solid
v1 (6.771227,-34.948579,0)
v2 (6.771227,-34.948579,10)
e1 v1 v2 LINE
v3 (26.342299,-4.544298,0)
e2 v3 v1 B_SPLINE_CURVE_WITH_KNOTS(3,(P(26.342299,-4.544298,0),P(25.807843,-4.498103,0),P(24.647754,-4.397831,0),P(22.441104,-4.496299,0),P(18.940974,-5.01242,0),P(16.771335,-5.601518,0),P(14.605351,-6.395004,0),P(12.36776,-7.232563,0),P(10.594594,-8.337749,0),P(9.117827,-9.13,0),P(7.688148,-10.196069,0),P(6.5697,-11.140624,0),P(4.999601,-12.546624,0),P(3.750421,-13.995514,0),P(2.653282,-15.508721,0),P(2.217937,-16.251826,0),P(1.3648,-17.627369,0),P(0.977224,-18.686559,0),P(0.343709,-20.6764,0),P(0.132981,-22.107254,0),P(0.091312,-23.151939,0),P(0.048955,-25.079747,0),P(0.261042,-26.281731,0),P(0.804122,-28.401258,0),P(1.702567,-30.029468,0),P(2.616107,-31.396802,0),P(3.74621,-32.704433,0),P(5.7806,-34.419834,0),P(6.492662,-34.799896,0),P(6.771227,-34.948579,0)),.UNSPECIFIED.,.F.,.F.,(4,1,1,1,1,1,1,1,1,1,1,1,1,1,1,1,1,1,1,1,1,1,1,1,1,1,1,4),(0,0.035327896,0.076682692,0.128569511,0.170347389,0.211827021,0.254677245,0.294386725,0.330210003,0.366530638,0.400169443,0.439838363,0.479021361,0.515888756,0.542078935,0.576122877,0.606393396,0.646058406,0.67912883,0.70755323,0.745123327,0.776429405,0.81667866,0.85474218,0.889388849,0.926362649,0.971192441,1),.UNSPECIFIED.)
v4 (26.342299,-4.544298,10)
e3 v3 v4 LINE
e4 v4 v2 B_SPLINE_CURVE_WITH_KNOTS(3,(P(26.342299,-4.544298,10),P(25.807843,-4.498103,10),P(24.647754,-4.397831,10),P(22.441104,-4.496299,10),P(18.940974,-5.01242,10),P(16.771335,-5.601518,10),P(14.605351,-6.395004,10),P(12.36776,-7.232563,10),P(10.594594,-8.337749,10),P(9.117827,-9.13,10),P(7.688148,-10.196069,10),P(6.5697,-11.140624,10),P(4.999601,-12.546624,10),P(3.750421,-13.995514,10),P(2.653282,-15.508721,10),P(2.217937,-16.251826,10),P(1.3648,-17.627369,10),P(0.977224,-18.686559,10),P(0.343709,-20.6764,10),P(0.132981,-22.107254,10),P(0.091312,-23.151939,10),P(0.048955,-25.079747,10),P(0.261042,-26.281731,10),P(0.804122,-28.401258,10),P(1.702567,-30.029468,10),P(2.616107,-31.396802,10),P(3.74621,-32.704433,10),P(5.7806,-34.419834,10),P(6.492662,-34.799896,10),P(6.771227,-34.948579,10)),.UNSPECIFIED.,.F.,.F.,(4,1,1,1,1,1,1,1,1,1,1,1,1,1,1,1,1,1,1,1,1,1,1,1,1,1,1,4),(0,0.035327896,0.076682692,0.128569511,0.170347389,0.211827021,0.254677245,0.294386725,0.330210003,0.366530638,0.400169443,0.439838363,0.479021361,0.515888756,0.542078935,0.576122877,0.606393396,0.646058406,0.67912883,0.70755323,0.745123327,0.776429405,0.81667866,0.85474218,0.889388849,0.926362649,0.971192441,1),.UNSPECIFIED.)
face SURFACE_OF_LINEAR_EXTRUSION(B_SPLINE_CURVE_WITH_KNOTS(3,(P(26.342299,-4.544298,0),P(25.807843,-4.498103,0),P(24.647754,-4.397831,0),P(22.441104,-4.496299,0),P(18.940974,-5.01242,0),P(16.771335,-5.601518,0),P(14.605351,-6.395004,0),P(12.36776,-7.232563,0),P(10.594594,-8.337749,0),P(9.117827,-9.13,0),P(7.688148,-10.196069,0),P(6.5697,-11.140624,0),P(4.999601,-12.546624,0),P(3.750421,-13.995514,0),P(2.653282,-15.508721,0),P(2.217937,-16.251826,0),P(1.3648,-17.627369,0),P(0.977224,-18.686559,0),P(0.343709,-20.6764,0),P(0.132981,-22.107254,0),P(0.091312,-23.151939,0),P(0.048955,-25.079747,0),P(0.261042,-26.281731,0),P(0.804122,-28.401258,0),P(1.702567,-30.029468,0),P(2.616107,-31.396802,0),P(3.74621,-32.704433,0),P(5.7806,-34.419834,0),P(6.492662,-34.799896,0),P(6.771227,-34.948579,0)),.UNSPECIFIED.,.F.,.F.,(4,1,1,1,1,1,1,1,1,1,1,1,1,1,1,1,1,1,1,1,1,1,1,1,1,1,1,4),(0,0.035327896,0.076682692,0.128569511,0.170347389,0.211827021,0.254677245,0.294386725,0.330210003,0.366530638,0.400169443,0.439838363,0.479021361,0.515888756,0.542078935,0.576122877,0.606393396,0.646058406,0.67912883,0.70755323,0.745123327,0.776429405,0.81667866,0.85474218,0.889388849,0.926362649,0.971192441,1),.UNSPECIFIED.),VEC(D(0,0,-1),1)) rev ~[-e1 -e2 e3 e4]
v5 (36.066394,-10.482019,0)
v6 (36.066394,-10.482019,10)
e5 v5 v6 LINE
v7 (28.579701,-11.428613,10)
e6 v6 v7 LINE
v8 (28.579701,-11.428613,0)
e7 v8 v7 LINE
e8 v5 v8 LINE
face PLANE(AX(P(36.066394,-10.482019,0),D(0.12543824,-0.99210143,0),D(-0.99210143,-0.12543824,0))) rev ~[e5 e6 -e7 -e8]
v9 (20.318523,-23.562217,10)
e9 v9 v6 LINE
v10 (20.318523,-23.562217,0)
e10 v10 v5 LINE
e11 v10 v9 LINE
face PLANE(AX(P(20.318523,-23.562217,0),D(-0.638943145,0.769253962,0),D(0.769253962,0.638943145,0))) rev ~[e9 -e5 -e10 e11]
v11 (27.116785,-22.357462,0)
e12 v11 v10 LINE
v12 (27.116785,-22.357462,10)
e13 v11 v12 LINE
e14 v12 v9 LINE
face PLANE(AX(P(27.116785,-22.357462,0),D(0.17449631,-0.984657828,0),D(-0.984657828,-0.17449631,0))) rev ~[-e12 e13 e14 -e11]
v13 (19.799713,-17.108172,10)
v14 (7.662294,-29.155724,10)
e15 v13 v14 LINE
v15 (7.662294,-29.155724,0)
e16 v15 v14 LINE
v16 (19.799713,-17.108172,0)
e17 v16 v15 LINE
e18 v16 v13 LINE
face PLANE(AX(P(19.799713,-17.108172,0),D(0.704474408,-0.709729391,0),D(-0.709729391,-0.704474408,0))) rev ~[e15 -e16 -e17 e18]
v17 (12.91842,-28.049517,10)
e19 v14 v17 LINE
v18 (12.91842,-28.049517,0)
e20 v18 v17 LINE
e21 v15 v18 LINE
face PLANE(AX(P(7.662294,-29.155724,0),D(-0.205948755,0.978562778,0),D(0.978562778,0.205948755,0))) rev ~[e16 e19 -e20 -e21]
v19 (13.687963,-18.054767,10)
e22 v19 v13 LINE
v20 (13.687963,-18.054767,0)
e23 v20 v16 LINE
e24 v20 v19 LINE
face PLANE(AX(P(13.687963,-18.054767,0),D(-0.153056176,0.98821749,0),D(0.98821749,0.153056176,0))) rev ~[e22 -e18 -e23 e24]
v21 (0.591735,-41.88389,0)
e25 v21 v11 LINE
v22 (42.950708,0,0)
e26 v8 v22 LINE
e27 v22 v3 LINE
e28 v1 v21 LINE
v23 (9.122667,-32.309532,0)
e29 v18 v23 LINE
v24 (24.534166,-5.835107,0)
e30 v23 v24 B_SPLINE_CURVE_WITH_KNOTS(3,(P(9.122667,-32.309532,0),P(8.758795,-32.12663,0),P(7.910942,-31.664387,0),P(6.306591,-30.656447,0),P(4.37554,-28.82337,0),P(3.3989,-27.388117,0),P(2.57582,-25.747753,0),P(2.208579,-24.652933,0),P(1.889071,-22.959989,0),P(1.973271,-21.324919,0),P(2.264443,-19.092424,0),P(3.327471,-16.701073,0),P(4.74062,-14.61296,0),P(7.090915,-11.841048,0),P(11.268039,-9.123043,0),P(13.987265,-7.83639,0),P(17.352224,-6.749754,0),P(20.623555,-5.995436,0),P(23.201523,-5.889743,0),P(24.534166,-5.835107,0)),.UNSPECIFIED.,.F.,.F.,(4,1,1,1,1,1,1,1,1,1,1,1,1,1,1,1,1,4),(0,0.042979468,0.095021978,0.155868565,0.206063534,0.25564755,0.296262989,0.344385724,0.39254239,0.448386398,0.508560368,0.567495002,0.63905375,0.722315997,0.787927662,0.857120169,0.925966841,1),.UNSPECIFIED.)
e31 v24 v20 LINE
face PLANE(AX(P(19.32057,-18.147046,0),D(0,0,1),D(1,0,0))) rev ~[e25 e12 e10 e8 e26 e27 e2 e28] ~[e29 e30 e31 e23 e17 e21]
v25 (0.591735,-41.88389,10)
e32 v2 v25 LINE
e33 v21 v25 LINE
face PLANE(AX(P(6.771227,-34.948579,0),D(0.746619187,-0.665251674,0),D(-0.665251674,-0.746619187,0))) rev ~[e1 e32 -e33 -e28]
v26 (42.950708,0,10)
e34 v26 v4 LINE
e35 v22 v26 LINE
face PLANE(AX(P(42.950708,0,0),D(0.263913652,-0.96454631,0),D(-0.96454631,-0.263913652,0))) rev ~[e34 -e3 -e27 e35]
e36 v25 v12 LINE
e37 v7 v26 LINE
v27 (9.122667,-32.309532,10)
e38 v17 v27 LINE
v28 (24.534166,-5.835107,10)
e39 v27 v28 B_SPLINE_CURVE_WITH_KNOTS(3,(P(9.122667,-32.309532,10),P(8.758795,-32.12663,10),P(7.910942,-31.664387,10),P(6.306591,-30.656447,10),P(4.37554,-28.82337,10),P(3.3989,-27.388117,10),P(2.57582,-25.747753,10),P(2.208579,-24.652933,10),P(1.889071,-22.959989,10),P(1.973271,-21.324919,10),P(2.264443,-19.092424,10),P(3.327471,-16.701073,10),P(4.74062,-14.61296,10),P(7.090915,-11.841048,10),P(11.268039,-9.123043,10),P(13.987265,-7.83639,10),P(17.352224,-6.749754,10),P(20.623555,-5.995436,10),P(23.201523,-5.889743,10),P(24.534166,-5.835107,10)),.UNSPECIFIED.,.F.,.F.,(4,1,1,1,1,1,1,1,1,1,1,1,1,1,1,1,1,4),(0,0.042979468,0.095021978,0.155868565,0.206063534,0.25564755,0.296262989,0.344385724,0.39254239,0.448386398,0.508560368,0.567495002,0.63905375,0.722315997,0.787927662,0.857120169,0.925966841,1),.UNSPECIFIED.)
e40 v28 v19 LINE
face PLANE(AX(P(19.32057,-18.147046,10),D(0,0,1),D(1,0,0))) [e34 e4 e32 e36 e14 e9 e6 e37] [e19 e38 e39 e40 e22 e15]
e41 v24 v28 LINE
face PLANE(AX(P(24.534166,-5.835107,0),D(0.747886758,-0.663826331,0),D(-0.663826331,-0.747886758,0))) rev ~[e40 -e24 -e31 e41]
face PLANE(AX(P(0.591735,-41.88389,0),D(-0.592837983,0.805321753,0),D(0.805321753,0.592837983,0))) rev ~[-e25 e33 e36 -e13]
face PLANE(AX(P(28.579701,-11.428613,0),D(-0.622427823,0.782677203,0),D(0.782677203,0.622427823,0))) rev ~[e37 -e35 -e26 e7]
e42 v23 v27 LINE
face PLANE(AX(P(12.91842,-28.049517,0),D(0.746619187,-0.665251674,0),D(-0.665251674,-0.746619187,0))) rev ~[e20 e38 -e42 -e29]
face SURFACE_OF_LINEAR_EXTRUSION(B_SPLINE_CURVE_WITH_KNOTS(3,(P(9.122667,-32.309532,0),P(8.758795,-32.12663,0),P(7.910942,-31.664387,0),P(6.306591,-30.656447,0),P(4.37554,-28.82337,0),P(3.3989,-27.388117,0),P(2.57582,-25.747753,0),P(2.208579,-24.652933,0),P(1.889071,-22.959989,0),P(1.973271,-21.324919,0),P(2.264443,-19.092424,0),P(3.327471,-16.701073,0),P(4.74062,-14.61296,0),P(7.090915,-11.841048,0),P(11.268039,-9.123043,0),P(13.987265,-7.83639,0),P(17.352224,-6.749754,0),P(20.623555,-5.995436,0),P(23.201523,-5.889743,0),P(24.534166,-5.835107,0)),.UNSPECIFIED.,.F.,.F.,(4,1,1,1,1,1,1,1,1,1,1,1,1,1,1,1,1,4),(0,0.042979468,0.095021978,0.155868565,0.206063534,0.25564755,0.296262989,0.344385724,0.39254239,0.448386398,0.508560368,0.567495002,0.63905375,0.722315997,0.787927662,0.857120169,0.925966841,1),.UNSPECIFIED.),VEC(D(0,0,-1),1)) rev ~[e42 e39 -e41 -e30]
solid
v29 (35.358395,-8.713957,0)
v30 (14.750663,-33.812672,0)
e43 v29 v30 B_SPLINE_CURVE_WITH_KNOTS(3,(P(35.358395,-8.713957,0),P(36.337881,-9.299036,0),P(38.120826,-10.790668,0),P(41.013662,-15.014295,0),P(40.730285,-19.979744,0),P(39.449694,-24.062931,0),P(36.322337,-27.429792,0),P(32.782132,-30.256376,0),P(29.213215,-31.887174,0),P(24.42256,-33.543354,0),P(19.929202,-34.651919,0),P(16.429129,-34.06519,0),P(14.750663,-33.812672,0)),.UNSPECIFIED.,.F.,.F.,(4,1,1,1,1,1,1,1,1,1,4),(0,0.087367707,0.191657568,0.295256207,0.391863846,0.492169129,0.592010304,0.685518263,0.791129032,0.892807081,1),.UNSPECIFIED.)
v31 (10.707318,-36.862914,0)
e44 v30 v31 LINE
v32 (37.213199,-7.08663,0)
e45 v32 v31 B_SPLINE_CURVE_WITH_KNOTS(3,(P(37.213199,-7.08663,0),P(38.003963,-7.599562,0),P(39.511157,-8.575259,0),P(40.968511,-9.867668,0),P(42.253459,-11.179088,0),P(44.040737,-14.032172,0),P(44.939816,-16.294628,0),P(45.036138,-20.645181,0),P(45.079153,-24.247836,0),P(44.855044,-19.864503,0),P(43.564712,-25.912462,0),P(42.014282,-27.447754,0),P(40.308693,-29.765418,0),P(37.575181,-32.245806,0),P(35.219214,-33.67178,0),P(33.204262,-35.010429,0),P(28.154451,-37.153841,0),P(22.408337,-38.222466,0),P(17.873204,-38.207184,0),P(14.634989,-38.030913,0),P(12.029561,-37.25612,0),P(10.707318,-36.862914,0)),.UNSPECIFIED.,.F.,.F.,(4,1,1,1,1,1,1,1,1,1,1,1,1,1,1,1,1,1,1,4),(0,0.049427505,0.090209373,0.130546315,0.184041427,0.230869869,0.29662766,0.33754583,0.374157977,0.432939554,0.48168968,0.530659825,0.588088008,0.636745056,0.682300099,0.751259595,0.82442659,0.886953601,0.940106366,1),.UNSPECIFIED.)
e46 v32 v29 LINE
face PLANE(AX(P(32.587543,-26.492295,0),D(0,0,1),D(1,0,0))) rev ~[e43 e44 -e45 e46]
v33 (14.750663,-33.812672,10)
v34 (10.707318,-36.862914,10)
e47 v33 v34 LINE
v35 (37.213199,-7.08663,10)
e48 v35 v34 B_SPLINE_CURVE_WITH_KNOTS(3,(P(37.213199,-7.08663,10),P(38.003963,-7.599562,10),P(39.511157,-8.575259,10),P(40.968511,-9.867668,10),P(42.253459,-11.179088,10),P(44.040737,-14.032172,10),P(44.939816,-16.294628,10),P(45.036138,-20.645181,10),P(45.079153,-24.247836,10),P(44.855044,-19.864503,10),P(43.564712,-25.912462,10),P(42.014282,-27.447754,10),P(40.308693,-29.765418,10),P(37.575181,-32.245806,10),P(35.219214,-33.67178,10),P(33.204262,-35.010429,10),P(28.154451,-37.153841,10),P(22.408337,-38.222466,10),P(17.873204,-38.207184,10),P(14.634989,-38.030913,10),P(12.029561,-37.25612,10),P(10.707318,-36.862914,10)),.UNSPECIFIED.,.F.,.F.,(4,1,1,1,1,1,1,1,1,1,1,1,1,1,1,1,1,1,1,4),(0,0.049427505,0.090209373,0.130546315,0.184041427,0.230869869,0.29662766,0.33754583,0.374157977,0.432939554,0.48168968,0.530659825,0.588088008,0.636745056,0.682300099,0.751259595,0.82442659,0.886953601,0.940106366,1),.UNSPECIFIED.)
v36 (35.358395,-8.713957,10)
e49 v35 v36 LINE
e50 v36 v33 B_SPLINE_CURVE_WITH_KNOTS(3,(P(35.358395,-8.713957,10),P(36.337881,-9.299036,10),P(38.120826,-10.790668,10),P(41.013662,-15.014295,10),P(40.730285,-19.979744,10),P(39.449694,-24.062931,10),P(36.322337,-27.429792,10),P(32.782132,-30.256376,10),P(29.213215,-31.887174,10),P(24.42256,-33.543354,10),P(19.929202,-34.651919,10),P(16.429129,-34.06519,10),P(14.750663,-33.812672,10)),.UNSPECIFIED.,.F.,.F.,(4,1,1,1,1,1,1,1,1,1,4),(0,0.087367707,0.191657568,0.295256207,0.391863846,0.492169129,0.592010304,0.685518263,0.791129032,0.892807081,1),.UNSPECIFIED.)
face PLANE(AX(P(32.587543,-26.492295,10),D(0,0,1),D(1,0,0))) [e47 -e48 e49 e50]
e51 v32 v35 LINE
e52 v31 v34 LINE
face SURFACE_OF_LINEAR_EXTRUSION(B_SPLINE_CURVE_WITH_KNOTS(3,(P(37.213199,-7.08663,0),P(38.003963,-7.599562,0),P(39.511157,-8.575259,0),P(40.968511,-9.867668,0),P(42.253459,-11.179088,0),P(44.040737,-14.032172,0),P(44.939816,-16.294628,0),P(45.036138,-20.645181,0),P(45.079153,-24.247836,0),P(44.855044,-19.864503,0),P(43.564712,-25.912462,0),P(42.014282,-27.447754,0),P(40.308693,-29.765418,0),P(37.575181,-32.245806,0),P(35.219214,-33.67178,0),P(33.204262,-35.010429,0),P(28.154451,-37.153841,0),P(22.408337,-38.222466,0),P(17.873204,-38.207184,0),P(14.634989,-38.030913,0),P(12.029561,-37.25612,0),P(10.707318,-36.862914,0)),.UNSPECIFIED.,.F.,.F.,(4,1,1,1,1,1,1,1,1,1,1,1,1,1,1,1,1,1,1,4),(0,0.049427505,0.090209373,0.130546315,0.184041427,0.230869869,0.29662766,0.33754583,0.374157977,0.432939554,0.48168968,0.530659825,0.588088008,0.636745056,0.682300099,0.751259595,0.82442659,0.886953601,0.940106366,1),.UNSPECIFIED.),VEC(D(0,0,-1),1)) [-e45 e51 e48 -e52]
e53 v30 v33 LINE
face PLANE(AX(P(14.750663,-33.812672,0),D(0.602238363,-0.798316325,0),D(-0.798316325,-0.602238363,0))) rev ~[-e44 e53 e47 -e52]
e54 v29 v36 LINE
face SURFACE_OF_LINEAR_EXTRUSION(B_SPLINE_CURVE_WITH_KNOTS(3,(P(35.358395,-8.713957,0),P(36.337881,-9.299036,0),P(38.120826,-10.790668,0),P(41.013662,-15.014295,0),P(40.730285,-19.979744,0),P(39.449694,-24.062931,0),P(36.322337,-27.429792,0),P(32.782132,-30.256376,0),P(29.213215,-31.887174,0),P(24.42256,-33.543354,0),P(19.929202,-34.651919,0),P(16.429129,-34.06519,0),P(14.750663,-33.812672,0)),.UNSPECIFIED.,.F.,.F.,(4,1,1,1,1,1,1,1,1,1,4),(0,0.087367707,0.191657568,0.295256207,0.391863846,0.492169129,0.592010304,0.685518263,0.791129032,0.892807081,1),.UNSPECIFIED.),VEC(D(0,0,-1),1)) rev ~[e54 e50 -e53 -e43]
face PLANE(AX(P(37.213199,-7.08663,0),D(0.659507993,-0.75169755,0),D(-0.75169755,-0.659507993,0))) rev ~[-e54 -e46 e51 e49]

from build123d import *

# Parameters (mm, degrees)
F1_DEPTH = 10


# Not quite as in the source:
# - a feature of the source that left no trace in its solid (it failed there, or was rolled back) is left out


with BuildPart() as f1:
    # F0 (on Top) → F1 (new body)
    with BuildSketch(Plane.XY):
        with BuildLine():
            Line((6.7712266664, -34.9485791715), (0.5917352391, -41.8838895857))
            Line((0.5917352391, -41.8838895857), (27.1167848259, -22.357461974))
            Line((27.1167848259, -22.357461974), (20.3185230494, -23.5622171313))
            Line((20.3185230494, -23.5622171313), (36.0663942993, -10.4820188135))
            Line((36.0663942993, -10.4820188135), (28.5797007382, -11.4286132157))
            Line((28.5797007382, -11.4286132157), (42.9507084191, 0))
            Line((42.9507084191, 0), (26.3422988355, -4.5442981645))
            add(Edge.make_bspline(
                [(26.3422988355, -4.5442981645), (25.8078429871, -4.4981026613), (24.6477537147, -4.397830753), (22.4411040837, -4.4962992569), (18.9409738337, -5.0124200177), (16.7713353432, -5.6015179544), (14.6053514546, -6.3950040748), (12.3677600296, -7.2325630823), (10.5945935269, -8.3377494254), (9.1178266686, -9.1299999948), (7.6881476544, -10.1960688332), (6.5697003284, -11.1406239757), (4.9996008275, -12.5466240058), (3.750420964, -13.9955143391), (2.6532822105, -15.5087208498), (2.2179365417, -16.2518261338), (1.3648002526, -17.6273689957), (0.9772244672, -18.6865585645), (0.3437092481, -20.6764003422), (0.132981441, -22.1072539999), (0.0913115279, -23.1519385454), (0.0489551854, -25.0797474167), (0.2610416036, -26.281731387), (0.8041219133, -28.4012577684), (1.7025670054, -30.0294676037), (2.616107057, -31.396802322), (3.7462102067, -32.7044331363), (5.7805997809, -34.4198344322), (6.4926618956, -34.799895889), (6.7712266664, -34.9485791715)],
                knots=[0, 0, 0, 0, 0.0353278959, 0.0766826917, 0.1285695112, 0.1703473888, 0.2118270215, 0.2546772453, 0.2943867249, 0.3302100033, 0.3665306376, 0.4001694433, 0.4398383629, 0.479021361, 0.5158887562, 0.5420789353, 0.5761228769, 0.606393396, 0.6460584058, 0.6791288299, 0.7075532301, 0.7451233272, 0.7764294046, 0.8166786602, 0.85474218, 0.8893888486, 0.9263626494, 0.9711924406, 1, 1, 1, 1], degree=3))
        make_face()
        with BuildLine():
            add(Edge.make_bspline(
                [(9.1226673937, -32.3095316776), (8.7587950877, -32.1266297091), (7.9109419803, -31.6643872593), (6.3065914642, -30.6564466653), (4.3755403597, -28.8233696959), (3.3989004542, -27.3881165551), (2.5758203214, -25.7477529854), (2.2085789347, -24.6529328483), (1.8890714, -22.9599893607), (1.9732711776, -21.3249194942), (2.2644433552, -19.0924237867), (3.3274707055, -16.7010730558), (4.740620184, -14.6129601331), (7.0909150889, -11.841048354), (11.2680390158, -9.1230428498), (13.9872648451, -7.8363900411), (17.3522243585, -6.7497538917), (20.6235545311, -5.9954361088), (23.2015225837, -5.8897433856), (24.5341658592, -5.835107062)],
                knots=[0, 0, 0, 0, 0.0429794677, 0.0950219776, 0.1558685653, 0.2060635337, 0.2556475504, 0.2962629889, 0.3443857243, 0.3925423903, 0.4483863982, 0.5085603685, 0.5674950025, 0.6390537502, 0.7223159975, 0.7879276623, 0.8571201686, 0.9259668406, 1, 1, 1, 1], degree=3))
            Line((24.5341658592, -5.835107062), (13.6879626662, -18.0547665805))
            Line((13.6879626662, -18.0547665805), (19.7997130454, -17.1081721783))
            Line((19.7997130454, -17.1081721783), (7.6622935012, -29.1557237506))
            Line((7.6622935012, -29.1557237506), (12.9184202345, -28.0495169957))
            Line((12.9184202345, -28.0495169957), (9.1226673937, -32.3095316776))
        make_face(mode=Mode.SUBTRACT)
    extrude(amount=F1_DEPTH)


with BuildPart() as f1b:
    # F0 (on Top) → F1, piece 2 (new body)
    with BuildSketch(Plane.XY):
        with BuildLine():
            Line((37.2131988406, -7.0866299793), (35.3583954275, -8.7139569223))
            add(Edge.make_bspline(
                [(35.3583954275, -8.7139569223), (36.3378810059, -9.2990359155), (38.1208264676, -10.7906681601), (41.0136616979, -15.0142954637), (40.7302854757, -19.9797435506), (39.4496938965, -24.0629309921), (36.322337101, -27.4297919783), (32.782132289, -30.2563763173), (29.2132154423, -31.8871735641), (24.4225596815, -33.5433536559), (19.9292022469, -34.651918561), (16.4291285285, -34.0651901088), (14.7506631911, -33.8126718998)],
                knots=[0, 0, 0, 0, 0.0873677066, 0.1916575682, 0.2952562075, 0.3918638462, 0.4921691286, 0.5920103036, 0.6855182634, 0.7911290325, 0.8928070809, 1, 1, 1, 1], degree=3))
            Line((14.7506631911, -33.8126718998), (10.7073178515, -36.8629135191))
            add(Edge.make_bspline(
                [(37.2131988406, -7.0866299793), (38.0039627841, -7.5995621332), (39.5111572818, -8.5752585824), (40.9685114935, -9.8676683125), (42.2534586977, -11.1790878844), (44.0407365865, -14.0321723947), (44.939816218, -16.2946280399), (45.0361378773, -20.6451806436), (45.0791530187, -24.2478358004), (44.8550437466, -19.8645032564), (43.5647115361, -25.9124618391), (42.0142819502, -27.4477535289), (40.3086929783, -29.765417743), (37.5751807702, -32.2458055729), (35.21921375, -33.6717801447), (33.204261961, -35.0104294821), (28.1544510173, -37.1538405557), (22.4083374627, -38.2224659701), (17.8732038248, -38.2071837918), (14.6349893051, -38.0309131912), (12.0295608101, -37.2561196962), (10.7073178515, -36.8629135191)],
                knots=[0, 0, 0, 0, 0.0494275049, 0.0902093733, 0.1305463147, 0.1840414273, 0.2308698687, 0.2966276603, 0.3375458303, 0.374157977, 0.4329395539, 0.48168968, 0.5306598249, 0.5880880085, 0.6367450558, 0.6823000992, 0.7512595946, 0.8244265897, 0.8869536012, 0.9401063655, 1, 1, 1, 1], degree=3))
        make_face()
    extrude(amount=F1_DEPTH)


solid = Compound([f1.part, f1b.part])
